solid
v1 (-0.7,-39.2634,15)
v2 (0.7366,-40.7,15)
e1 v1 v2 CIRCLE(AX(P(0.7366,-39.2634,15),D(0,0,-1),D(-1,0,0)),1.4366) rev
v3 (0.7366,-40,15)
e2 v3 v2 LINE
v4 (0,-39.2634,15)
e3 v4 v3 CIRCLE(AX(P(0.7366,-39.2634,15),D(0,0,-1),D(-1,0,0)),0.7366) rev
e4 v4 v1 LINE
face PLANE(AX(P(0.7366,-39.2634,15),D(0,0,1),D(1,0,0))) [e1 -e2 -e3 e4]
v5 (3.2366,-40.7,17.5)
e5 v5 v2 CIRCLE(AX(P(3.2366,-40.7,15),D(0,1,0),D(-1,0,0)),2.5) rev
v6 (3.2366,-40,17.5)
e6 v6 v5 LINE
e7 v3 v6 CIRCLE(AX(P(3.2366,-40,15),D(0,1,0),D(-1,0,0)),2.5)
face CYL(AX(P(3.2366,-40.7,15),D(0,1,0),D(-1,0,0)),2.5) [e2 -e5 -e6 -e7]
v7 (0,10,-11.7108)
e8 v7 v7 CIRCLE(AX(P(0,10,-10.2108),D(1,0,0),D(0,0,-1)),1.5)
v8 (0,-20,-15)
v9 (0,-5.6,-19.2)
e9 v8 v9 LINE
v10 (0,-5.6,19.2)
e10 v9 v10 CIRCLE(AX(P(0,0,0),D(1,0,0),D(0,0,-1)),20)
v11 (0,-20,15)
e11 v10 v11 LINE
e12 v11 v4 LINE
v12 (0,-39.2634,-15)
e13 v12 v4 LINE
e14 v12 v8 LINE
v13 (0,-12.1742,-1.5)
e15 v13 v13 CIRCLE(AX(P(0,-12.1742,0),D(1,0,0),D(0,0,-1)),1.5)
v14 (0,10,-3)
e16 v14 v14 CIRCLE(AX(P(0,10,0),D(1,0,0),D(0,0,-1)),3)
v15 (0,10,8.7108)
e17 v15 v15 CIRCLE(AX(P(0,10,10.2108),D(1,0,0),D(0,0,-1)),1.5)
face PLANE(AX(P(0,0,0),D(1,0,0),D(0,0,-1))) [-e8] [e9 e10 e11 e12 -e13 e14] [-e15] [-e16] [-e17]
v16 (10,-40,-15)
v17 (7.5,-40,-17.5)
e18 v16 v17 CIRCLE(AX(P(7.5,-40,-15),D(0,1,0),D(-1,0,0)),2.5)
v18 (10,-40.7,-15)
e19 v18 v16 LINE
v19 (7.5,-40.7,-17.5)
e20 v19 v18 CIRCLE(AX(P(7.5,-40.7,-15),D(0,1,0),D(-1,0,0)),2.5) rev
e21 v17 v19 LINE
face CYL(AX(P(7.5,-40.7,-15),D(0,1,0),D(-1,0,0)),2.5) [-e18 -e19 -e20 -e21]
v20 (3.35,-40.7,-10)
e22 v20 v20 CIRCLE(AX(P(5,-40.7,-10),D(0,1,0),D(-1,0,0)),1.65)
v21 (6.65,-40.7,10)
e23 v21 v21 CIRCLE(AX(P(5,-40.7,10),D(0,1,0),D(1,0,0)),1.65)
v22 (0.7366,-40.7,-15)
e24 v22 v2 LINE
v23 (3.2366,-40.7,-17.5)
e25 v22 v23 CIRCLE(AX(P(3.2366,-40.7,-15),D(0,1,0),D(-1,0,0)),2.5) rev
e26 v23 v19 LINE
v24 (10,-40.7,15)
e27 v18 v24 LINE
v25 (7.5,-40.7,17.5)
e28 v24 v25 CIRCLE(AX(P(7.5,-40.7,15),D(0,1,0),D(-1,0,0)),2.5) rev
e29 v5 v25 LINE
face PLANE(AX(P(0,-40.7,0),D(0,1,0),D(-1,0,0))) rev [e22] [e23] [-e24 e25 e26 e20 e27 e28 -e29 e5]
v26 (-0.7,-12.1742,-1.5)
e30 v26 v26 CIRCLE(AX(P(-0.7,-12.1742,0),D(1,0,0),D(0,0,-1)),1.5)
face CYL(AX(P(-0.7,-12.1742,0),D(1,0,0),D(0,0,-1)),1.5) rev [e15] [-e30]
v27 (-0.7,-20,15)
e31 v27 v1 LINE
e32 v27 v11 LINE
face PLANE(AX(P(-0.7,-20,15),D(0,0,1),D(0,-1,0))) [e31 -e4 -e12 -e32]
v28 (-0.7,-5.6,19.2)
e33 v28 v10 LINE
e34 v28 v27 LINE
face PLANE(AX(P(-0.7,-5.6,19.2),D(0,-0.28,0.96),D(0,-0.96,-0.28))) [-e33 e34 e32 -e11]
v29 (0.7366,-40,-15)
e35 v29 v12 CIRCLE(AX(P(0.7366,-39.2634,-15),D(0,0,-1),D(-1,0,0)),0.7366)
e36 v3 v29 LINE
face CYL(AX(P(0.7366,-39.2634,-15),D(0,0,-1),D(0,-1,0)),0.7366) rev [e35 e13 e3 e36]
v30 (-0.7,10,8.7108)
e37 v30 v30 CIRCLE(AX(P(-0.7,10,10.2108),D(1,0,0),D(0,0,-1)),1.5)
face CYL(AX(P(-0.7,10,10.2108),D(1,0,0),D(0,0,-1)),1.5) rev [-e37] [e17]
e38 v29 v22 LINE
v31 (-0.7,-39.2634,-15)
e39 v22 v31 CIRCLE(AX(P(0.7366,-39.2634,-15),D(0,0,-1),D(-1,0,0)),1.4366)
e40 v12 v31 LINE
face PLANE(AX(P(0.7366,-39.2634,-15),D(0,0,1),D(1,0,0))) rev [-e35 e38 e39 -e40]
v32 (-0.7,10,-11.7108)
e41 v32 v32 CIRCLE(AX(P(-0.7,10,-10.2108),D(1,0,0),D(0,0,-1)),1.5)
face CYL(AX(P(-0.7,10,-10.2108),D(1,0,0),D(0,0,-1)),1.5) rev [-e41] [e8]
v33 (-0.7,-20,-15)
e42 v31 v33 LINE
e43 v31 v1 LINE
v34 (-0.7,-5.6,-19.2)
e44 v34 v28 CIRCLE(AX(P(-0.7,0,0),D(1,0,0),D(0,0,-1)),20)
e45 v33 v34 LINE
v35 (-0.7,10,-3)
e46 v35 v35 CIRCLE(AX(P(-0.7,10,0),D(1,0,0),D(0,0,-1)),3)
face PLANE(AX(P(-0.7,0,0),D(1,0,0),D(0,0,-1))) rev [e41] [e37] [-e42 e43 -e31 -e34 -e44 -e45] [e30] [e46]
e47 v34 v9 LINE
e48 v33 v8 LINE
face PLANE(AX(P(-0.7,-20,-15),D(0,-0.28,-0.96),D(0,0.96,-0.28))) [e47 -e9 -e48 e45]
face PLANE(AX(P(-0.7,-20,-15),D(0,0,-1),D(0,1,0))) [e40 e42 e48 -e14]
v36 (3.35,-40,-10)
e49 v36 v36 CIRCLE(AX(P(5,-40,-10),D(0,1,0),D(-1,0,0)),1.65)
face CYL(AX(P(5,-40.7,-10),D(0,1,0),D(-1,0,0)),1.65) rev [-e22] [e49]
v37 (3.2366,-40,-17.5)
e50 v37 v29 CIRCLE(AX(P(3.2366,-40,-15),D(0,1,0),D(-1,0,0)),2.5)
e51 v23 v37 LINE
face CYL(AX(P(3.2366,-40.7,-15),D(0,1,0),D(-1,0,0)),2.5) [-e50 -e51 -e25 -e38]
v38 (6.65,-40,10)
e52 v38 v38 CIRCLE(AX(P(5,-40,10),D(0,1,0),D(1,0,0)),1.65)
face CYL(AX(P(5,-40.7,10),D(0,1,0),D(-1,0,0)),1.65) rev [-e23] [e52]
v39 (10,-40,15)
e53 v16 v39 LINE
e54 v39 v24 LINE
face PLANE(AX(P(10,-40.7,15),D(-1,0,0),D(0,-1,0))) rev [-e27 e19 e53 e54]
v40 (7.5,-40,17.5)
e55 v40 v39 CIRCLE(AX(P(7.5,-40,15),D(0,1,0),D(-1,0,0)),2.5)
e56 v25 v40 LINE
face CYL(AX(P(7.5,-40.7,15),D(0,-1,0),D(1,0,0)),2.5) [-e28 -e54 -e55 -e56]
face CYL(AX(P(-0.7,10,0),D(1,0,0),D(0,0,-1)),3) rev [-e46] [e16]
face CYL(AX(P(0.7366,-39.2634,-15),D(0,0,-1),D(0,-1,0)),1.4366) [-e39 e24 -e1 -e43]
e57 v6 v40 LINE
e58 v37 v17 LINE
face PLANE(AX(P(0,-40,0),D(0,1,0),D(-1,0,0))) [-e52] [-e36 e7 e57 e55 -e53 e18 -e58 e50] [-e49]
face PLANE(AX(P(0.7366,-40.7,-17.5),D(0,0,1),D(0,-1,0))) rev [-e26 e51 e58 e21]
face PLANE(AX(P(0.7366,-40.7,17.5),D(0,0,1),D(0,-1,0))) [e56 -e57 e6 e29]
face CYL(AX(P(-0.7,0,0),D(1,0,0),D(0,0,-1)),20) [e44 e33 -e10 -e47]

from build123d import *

# Parameters (mm, degrees)
BASE_FLANGE1_DEPTH           = 0.7
SKETCH4_R                    = 1.5
SKETCH4_R_2                  = 3
CUT_EXTRUDE1_DEPTH           = 45.726837581
EDGE_FLANGE1_STRIP_W         = 4.2732
EDGE_FLANGE1_STRIP_H         = 0.7
EDGE_FLANGE1_STRIP_CUT_DEPTH = 30
EDGE_FLANGE1_DEPTH           = 30
SKETCH11_W                   = 9.2634
SKETCH11_H                   = 2.5
TAB1_DEPTH                   = 0.7
SKETCH10_R                   = 1.65
CUT_EXTRUDE2_DEPTH           = 0.7
BREAK_CORNER1_START          = -40.7
BREAK_CORNER1_DEPTH          = 0.7


# Read off the part's stored shape, not the designer's step: Break-Corner1
# Sheet-metal steps are written as plain solids
with BuildPart() as part:
    # Sketch1 → Base-Flange1 (new body)
    with BuildSketch(Plane(origin=(0, 0, 0), x_dir=(0, 0, -1), z_dir=(1, 0, 0))):
        with BuildLine():
            Line((-19.2, -5.6), (-15, -20))
            Line((-15, -20), (-15, -40))
            Line((-15, -40), (15, -40))
            Line((15, -40), (15, -20))
            Line((15, -20), (19.2, -5.6))
            ThreePointArc((19.2, -5.6), (0, 20), (-19.2, -5.6))
        make_face()
    extrude(amount=-BASE_FLANGE1_DEPTH)

    # Sketch4 → Cut-Extrude1 (cut, through all)
    with BuildSketch(Plane(origin=(0, 0, 0), x_dir=(0, 0, -1), z_dir=(1, 0, 0))):
        with Locations((-10.2108, 10)):
            Circle(SKETCH4_R)
        with Locations((10.2108, 10)):
            Circle(SKETCH4_R)
        with Locations((0, 10)):
            Circle(SKETCH4_R_2)
        with Locations((0, -12.1742)):
            Circle(SKETCH4_R)
    extrude(amount=-CUT_EXTRUDE1_DEPTH, mode=Mode.SUBTRACT)

    # Edge-Flange1 strip (across the edge) → Edge-Flange1 strip cut (cut)
    with BuildSketch(Plane(origin=(0, -40, 15), x_dir=(0, 1, 0), z_dir=(0, 0, -1))):
        with Locations((-1.4, -0.35)):
            Rectangle(EDGE_FLANGE1_STRIP_W, EDGE_FLANGE1_STRIP_H)
    extrude(amount=EDGE_FLANGE1_STRIP_CUT_DEPTH, mode=Mode.SUBTRACT)

    # Edge-Flange1 section (across the edge) → Edge-Flange1 (add)
    with BuildSketch(Plane(origin=(0, -40, 15), x_dir=(0, 1, 0), z_dir=(0, 0, -1))):
        with BuildLine():
            Line((-0.7, 0.7366), (-0.7, 10))
            Line((-0.7, 10), (0, 10))
            Line((0, 10), (0, 0.7366))
            ThreePointArc((0, 0.7366), (0.215745145, 0.215745145), (0.7366, 0))
            Line((0.7366, 0), (0.7366, -0.7))
            ThreePointArc((0.7366, -0.7), (-0.279229602, -0.279229602), (-0.7, 0.7366))
        make_face()
    extrude(amount=EDGE_FLANGE1_DEPTH)

    # Sketch11 → Tab1 (add)
    with BuildSketch(Plane(origin=(0, -40, 0), x_dir=(1, 0, 0), z_dir=(0, 1, 0))):
        with Locations((5.3683, -16.25)):
            Rectangle(SKETCH11_W, SKETCH11_H)
    tab1 = extrude(amount=-TAB1_DEPTH)

    # Mirror1: Tab1 across plane
    add(tab1.mirror(Plane.XY))

    # Sketch10 → Cut-Extrude2 (cut)
    with BuildSketch(Plane(origin=(0, -40, 0), x_dir=(1, 0, 0), z_dir=(0, 1, 0))):
        with Locations(Location((5, 10, 0), (0, 0, 180))):
            Circle(SKETCH10_R)
        with Locations((5, -10)):
            Circle(SKETCH10_R)
    extrude(amount=-CUT_EXTRUDE2_DEPTH, mode=Mode.SUBTRACT)

    # Break-Corner1 outline → Break-Corner1 (cut)
    with BuildSketch(Plane(origin=(0, 0, 0), x_dir=(1, 0, 0), z_dir=(0, 1, 0)).offset(BREAK_CORNER1_START)):
        with BuildLine():
            Line((10, -17.5), (10, -15))
            ThreePointArc((10, -15), (9.267766953, -16.767766953), (7.5, -17.5))
            Line((7.5, -17.5), (10, -17.5))
        make_face()
        with BuildLine():
            ThreePointArc((0.7366, 15), (1.468833047, 16.767766953), (3.2366, 17.5))
            Line((3.2366, 17.5), (0.7366, 17.5))
            Line((0.7366, 17.5), (0.7366, 15))
        make_face()
        with BuildLine():
            ThreePointArc((7.5, 17.5), (9.267766953, 16.767766953), (10, 15))
            Line((10, 15), (10, 17.5))
            Line((10, 17.5), (7.5, 17.5))
        make_face()
        with BuildLine():
            Line((0.7366, -17.5), (3.2366, -17.5))
            ThreePointArc((3.2366, -17.5), (1.468833047, -16.767766953), (0.7366, -15))
            Line((0.7366, -15), (0.7366, -17.5))
        make_face()
    extrude(amount=BREAK_CORNER1_DEPTH, mode=Mode.SUBTRACT)


solid = part.part
